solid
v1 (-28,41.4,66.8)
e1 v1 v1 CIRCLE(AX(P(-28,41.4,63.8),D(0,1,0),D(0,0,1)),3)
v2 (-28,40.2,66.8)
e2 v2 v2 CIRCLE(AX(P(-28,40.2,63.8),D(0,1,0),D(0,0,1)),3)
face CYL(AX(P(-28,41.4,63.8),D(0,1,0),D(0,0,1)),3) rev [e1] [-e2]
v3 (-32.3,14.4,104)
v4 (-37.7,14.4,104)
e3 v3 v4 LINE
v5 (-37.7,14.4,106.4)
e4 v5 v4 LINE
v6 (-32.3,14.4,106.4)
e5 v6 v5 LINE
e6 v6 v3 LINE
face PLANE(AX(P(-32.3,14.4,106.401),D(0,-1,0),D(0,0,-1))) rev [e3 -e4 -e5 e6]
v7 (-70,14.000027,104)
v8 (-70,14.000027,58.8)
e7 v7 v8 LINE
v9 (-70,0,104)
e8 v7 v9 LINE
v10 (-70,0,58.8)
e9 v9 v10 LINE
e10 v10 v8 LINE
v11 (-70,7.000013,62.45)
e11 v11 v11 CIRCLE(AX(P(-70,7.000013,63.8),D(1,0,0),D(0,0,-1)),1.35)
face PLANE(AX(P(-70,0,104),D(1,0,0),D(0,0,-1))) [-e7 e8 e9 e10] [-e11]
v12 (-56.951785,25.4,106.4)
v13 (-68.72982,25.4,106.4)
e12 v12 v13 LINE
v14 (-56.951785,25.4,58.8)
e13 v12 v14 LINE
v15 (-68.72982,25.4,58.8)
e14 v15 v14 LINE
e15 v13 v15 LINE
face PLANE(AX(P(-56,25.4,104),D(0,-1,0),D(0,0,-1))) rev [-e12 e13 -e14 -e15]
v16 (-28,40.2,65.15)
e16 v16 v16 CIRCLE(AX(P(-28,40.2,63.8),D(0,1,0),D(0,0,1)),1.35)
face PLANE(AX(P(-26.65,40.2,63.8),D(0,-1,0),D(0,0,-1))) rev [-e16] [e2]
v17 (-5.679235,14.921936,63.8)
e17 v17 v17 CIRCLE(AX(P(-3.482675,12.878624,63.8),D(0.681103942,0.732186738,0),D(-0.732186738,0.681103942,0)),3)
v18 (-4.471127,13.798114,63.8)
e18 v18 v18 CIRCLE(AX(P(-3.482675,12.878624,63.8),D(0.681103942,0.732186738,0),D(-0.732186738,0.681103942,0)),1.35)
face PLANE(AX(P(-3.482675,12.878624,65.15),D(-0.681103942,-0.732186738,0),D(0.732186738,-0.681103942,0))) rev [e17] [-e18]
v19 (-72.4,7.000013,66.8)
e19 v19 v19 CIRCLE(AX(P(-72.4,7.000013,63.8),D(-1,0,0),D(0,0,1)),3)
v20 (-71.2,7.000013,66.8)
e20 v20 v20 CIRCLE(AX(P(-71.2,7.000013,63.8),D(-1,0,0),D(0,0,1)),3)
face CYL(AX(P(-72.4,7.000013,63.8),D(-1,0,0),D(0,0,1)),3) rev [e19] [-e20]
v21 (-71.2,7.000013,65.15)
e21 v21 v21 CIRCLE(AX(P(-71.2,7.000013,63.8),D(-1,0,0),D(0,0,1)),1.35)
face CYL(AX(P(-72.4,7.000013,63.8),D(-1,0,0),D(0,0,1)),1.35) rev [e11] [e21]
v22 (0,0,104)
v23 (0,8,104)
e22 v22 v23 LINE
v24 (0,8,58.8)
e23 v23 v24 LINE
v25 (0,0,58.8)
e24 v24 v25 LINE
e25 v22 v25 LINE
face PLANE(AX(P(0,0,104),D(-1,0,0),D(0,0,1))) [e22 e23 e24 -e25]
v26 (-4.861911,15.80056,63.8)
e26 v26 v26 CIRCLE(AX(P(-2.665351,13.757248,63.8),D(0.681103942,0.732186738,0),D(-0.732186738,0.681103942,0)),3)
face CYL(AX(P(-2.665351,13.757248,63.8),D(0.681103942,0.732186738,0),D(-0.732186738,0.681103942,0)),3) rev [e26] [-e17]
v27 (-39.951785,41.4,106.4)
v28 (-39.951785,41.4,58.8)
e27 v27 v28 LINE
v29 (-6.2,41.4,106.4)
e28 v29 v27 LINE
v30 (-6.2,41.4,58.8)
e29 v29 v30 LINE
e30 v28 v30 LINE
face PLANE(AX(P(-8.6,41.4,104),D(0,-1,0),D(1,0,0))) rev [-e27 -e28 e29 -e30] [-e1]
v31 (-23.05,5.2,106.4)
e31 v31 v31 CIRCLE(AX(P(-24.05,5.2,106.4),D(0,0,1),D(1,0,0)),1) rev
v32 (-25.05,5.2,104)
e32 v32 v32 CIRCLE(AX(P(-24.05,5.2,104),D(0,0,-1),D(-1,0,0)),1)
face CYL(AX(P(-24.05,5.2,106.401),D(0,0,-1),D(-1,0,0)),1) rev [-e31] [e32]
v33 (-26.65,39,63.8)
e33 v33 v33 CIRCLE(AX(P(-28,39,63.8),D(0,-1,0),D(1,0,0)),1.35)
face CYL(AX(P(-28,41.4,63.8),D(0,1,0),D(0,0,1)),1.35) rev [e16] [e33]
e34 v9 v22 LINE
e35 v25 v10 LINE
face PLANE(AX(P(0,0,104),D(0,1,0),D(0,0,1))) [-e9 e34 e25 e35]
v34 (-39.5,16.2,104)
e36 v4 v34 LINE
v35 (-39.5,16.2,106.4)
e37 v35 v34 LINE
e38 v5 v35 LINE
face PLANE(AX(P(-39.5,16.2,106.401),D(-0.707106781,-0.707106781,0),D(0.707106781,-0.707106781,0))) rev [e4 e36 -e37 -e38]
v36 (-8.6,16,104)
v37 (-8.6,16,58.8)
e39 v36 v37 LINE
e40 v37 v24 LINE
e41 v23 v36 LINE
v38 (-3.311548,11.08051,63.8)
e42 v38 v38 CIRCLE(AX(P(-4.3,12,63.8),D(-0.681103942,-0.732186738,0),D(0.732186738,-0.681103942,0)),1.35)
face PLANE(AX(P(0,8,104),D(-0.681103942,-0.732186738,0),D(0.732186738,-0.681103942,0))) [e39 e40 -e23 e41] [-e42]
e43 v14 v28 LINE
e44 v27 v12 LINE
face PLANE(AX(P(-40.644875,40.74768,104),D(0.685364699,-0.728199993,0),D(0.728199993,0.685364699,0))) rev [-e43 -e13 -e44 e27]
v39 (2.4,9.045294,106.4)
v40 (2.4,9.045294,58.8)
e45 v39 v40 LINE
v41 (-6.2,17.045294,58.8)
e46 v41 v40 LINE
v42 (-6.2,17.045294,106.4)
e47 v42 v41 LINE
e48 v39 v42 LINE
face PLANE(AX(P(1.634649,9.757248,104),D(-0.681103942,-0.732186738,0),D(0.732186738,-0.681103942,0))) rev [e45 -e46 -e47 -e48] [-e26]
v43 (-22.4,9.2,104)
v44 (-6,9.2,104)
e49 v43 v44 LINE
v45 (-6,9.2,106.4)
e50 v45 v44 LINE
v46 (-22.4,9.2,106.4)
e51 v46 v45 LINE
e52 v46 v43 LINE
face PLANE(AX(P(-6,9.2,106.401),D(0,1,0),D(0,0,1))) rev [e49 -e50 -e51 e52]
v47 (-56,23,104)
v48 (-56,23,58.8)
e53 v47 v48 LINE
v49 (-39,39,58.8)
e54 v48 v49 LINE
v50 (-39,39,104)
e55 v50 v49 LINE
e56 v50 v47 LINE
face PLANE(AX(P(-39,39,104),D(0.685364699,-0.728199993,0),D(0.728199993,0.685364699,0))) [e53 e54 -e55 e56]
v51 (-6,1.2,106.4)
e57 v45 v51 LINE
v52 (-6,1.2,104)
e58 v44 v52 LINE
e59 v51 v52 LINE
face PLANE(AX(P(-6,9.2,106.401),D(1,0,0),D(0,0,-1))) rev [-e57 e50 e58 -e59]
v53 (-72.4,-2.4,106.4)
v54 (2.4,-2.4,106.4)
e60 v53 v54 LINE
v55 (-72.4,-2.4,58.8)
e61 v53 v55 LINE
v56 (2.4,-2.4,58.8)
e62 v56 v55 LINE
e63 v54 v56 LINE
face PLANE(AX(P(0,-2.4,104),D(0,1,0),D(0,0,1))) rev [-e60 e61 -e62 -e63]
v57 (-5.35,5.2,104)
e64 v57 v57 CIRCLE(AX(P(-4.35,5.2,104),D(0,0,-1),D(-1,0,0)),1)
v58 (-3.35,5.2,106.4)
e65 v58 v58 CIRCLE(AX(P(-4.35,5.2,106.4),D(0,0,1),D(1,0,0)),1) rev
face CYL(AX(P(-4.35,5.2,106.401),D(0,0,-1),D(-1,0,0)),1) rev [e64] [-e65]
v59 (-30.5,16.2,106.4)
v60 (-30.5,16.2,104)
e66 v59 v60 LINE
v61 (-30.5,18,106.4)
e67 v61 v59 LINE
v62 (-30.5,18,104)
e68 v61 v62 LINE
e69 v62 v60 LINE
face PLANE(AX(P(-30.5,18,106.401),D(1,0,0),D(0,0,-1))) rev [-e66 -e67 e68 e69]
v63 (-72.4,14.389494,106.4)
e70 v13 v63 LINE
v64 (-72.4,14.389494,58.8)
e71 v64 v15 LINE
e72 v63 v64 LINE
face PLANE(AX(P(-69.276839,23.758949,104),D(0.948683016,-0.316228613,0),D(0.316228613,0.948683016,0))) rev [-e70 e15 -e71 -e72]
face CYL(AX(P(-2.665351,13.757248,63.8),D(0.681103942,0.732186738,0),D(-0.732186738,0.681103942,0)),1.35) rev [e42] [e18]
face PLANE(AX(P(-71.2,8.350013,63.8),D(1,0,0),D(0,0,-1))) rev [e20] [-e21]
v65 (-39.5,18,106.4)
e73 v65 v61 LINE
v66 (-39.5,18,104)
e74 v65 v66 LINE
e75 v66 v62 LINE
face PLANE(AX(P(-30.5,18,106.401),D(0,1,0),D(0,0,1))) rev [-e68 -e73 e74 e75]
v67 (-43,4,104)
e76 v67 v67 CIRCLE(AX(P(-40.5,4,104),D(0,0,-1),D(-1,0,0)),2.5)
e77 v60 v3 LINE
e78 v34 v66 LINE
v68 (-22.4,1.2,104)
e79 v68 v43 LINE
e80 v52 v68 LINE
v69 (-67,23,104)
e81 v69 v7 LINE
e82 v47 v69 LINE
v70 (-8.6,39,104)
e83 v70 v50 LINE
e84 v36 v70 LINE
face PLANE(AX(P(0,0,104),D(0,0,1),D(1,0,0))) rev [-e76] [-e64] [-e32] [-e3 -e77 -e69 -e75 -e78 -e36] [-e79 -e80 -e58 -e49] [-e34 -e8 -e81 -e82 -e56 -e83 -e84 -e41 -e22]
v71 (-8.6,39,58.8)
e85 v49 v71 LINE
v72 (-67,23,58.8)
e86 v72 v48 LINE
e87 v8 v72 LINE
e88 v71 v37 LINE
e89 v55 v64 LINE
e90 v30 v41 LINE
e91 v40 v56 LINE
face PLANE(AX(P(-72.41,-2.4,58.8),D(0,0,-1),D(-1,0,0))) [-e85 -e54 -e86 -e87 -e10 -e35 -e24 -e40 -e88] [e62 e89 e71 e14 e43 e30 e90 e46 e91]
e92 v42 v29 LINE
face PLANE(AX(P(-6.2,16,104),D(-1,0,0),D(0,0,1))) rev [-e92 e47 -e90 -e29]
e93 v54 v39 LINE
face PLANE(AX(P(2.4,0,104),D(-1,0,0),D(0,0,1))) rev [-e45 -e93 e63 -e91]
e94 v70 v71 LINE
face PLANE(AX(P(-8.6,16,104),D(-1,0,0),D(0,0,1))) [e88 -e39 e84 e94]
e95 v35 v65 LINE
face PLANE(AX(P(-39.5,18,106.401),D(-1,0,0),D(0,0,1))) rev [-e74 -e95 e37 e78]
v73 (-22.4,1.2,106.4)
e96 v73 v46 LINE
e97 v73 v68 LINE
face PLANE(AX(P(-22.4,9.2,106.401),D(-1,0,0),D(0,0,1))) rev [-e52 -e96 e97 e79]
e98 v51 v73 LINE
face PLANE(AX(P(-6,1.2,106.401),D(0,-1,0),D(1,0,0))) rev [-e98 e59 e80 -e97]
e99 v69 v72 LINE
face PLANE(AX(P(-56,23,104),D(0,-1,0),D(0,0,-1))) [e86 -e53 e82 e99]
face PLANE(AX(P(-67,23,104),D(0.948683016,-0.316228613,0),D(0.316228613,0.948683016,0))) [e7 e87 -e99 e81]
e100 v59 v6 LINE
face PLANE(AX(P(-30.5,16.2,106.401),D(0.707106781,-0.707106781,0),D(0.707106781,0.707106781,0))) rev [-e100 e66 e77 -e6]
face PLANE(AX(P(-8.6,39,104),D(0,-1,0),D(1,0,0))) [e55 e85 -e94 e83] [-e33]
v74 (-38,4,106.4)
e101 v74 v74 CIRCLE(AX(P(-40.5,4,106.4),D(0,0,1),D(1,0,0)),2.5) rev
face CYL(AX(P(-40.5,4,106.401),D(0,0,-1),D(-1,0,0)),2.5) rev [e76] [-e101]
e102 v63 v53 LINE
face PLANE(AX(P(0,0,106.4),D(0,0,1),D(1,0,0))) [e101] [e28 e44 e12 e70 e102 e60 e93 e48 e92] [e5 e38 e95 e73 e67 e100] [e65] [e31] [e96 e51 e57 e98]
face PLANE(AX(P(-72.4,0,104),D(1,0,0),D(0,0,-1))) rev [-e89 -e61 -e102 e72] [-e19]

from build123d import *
from OCP.BRepFilletAPI import BRepFilletAPI_MakeChamfer

# Parameters (mm, degrees)
BOSS_EXTRUDE1_DEPTH                            = 104
SHELL1_START                                   = -8.6
SHELL1_OUTLINE_W                               = 16
SHELL1_OUTLINE_H                               = 108.8
SHELL1_DEPTH                                   = 2.4
SHELL1_START_2                                 = -56.951785259
SHELL1_2_OUTLINE_W                             = 43.8
SHELL1_2_OUTLINE_H                             = 108.8
SHELL1_2_DEPTH                                 = 50.751785259
SHELL1_START_3                                 = -72.4
SHELL1_3_OUTLINE_W                             = 27.8
SHELL1_3_OUTLINE_H                             = 108.8
SHELL1_3_DEPTH                                 = 74.8
SHELL1_4_DEPTH                                 = 104
SHELL1_START_4                                 = -2.4
SHELL1_5_DEPTH                                 = 108.8
SPLIT1_SURFACE_1_BACK                          = 140.108
SPLIT1_SURFACE_1_DEPTH                         = 280.216
SPLIT1_SURFACE_2_BACK                          = 140.108
SPLIT1_SURFACE_2_DEPTH                         = 280.216
BOSS_EXTRUDE2_DEPTH                            = 4
BOSS_EXTRUDE3_DEPTH                            = 4
BOSS_EXTRUDE4_DEPTH                            = 4
CHAMFER1_SIZE                                  = 4
CHAMFER1_SIZE_2                                = 6.92820323
CBORE_START                                    = 7.057493905
CBORE_FOR_M2_5_PAN_HEAD_MACHINE_SCREW1_O_R     = 3
CBORE_FOR_M2_5_PAN_HEAD_MACHINE_SCREW1_DEPTH   = 1.2
CBORE_START_2                                  = 5.857493905
CBORE_FOR_M2_5_PAN_HEAD_MACHINE_SCRE_2_R       = 1.35
CBORE_FOR_M2_5_PAN_HEAD_MACHINE_SCREW1_2_DEPTH = 1.2
CBORE_START_3                                  = 40.2
CBORE_FOR_M2_5_PAN_HEAD_MACHINE_SCRE_3_R       = 3
CBORE_FOR_M2_5_PAN_HEAD_MACHINE_SCREW1_3_DEPTH = 1.2
CBORE_START_4                                  = 38
CBORE_FOR_M2_5_PAN_HEAD_MACHINE_SCRE_4_R       = 1.35
CBORE_FOR_M2_5_PAN_HEAD_MACHINE_SCREW1_4_DEPTH = 2.2
CBORE_START_5                                  = -72.4
CBORE_FOR_M2_5_PAN_HEAD_MACHINE_SCRE_5_R       = 3
CBORE_FOR_M2_5_PAN_HEAD_MACHINE_SCREW1_5_DEPTH = 1.2
CBORE_START_6                                  = -71.2
CBORE_FOR_M2_5_PAN_HEAD_MACHINE_SCRE_6_R       = 1.35
CBORE_FOR_M2_5_PAN_HEAD_MACHINE_SCREW1_6_DEPTH = 1.2
CUT_EXTRUDE2_REACH                             = 96.862
SKETCH12_R                                     = 1
SKETCH12_R_2                                   = 2.5
SKETCH12_W                                     = 16.4
SKETCH12_H                                     = 8


with BuildPart() as part:
    # Sketch1 → Boss-Extrude1 (new body)
    with BuildSketch(Plane.XY):
        Polygon((-39, 39), (-56, 23), (-67, 23), (-70, 14.000026796), (-70, 0), (0, 0), (0, 8), (-8.6, 16), (-8.6, 39), align=None)
    extrude(amount=BOSS_EXTRUDE1_DEPTH)

    # Shell1: read off the stored shape, not the designer's step
    # Shell1 outline → Shell1 (add)
    with BuildSketch(Plane.YZ.offset(SHELL1_START)):
        with Locations((33.4, 52)):
            Rectangle(SHELL1_OUTLINE_W, SHELL1_OUTLINE_H)
    extrude(amount=SHELL1_DEPTH)

    # Shell1 2 outline → Shell1 2 (add)
    with BuildSketch(Plane.YZ.offset(SHELL1_START_2)):
        with Locations((19.5, 52)):
            Rectangle(SHELL1_2_OUTLINE_W, SHELL1_2_OUTLINE_H)
    extrude(amount=SHELL1_2_DEPTH)

    # Shell1 3 outline → Shell1 3 (add)
    with BuildSketch(Plane.YZ.offset(SHELL1_START_3)):
        with Locations((11.5, 52)):
            Rectangle(SHELL1_3_OUTLINE_W, SHELL1_3_OUTLINE_H)
    extrude(amount=SHELL1_3_DEPTH)

    # Shell1 4 outline → Shell1 4 (cut)
    with BuildSketch(Plane.XY):
        Polygon((-6.2, 25.4), (-6.2, 17.045294183), (2.4, 9.045294183), (2.4, 25.4), align=None)
        Polygon((-72.4, 14.389494281), (-68.729820499, 25.4), (-72.4, 25.4), align=None)
        Polygon((-56.951785259, 25.4), (-39.951785259, 41.4), (-56.951785259, 41.4), align=None)
        Polygon((0, 0), (0, 8), (-8.6, 16), (-8.6, 39), (-39, 39), (-56, 23), (-67, 23), (-70, 14.000026796), (-70, 0), align=None)
    extrude(amount=SHELL1_4_DEPTH, mode=Mode.SUBTRACT)

    # Shell1 5 outline → Shell1 5 (cut)
    with BuildSketch(Plane.XY.offset(SHELL1_START_4)):
        Polygon((-6.2, 25.4), (-6.2, 17.045294183), (2.4, 9.045294183), (2.4, 25.4), align=None)
        Polygon((-72.4, 14.389494281), (-68.729820499, 25.4), (-72.4, 25.4), align=None)
        Polygon((-56.951785259, 25.4), (-39.951785259, 41.4), (-56.951785259, 41.4), align=None)
    extrude(amount=SHELL1_5_DEPTH, mode=Mode.SUBTRACT)


with BuildPart() as body_2:
    # Split1: the piece behind the surface
    add(part.part)
    # Split1 surface: a surface, the sketch's curves swept straight by 280.216 mm
    with BuildLine(Plane(origin=(0, 0, 0), x_dir=(0, 0, -1), z_dir=(1, 0, 0)).offset(-SPLIT1_SURFACE_1_BACK), mode=Mode.PRIVATE) as split1_surface_1_path:
        Line((-58.8, -2.4), (-58.8, 41.4))
    split1_surface_1 = Shell.extrude(split1_surface_1_path.wire(), (1 * SPLIT1_SURFACE_1_DEPTH, 0 * SPLIT1_SURFACE_1_DEPTH, 0 * SPLIT1_SURFACE_1_DEPTH))
    split(bisect_by=split1_surface_1, keep=Keep.BOTTOM)

    # Sketch3 → Boss-Extrude2 (add)
    with BuildSketch(Plane(origin=(3.989562192, 4.288779356, 0), x_dir=(0.7321867381630838, -0.6811039424772873, 0), z_dir=(-0.6811039424772873, -0.7321867381630838, 0))):
        with BuildLine():
            Line((-14.321650284, 51.3), (-8.321650284, 51.3))
            Line((-8.321650284, 51.3), (-8.321650284, 63.8))
            ThreePointArc((-8.321650284, 63.8), (-11.321650284, 66.8), (-14.321650284, 63.8))
            Line((-14.321650284, 63.8), (-14.321650284, 51.3))
        make_face()
    extrude(amount=BOSS_EXTRUDE2_DEPTH)

    # Sketch4 → Boss-Extrude3 (add)
    with BuildSketch(Plane.XZ.offset(-39)):
        with BuildLine():
            Line((-31, 51.3), (-25, 51.3))
            Line((-25, 51.3), (-25, 63.8))
            ThreePointArc((-25, 63.8), (-28, 66.8), (-31, 63.8))
            Line((-31, 63.8), (-31, 51.3))
        make_face()
    extrude(amount=BOSS_EXTRUDE3_DEPTH)

    # Sketch5 → Boss-Extrude4 (add)
    with BuildSketch(Plane(origin=(-70, 0, 0), x_dir=(0, 0, -1), z_dir=(1, 0, 0))):
        with BuildLine():
            Line((-51.3, 10.000013398), (-63.8, 10.000013398))
            ThreePointArc((-63.8, 10.000013398), (-66.8, 7.000013398), (-63.8, 4.000013398))
            Line((-63.8, 4.000013398), (-51.3, 4.000013398))
            Line((-51.3, 4.000013398), (-51.3, 10.000013398))
        make_face()
    extrude(amount=BOSS_EXTRUDE4_DEPTH)

    # Chamfer1
    chamfer1_edges_1 = [body_2.edges().sort_by_distance(p)[0] for p in [
        (-7.02441577, 9.071253047, 51.3),
    ]]
    chamfer1_side_1 = [body_2.faces().sort_by_distance(p)[0] for p in [
        (-6.969927455, 9.129827986, 51.3),
    ]]
    chamfer1_edges_2 = [body_2.edges().sort_by_distance(p)[0] for p in [
        (-28, 35, 51.3),
    ]]
    chamfer1_side_2 = [body_2.faces().sort_by_distance(p)[0] for p in [
        (-28, 35.08, 51.3),
    ]]
    chamfer1_edges_3 = [body_2.edges().sort_by_distance(p)[0] for p in [
        (-66, 7.000013398, 51.3),
    ]]
    chamfer1_side_3 = [body_2.faces().sort_by_distance(p)[0] for p in [
        (-66.08, 7.000013398, 51.3),
    ]]
    chamfer1 = BRepFilletAPI_MakeChamfer(body_2.part.solid().wrapped)
    for e in chamfer1_edges_1:
        chamfer1.Add(CHAMFER1_SIZE - 0.0001, CHAMFER1_SIZE_2 - 0.0001, e.wrapped, chamfer1_side_1[0].wrapped)
    for e in chamfer1_edges_2:
        chamfer1.Add(CHAMFER1_SIZE - 0.0001, CHAMFER1_SIZE_2 - 0.0001, e.wrapped, chamfer1_side_2[0].wrapped)
    for e in chamfer1_edges_3:
        chamfer1.Add(CHAMFER1_SIZE - 0.0001, CHAMFER1_SIZE_2 - 0.0001, e.wrapped, chamfer1_side_3[0].wrapped)
    add(Compound.cast(chamfer1.Shape()), mode=Mode.REPLACE)  # a hair under: the kernel refuses the full size

    # CBORE for M2.5 Pan Head Machine Screw1 7: loft between two sections, ruled curve by curve
    cbore_for_m2_5_pan_head_machine_screw1_7_from = [
        Edge.make_three_point_arc((-8.012867866, 9.99074337, 63.8), (-7.02441577, 9.071253047, 65.15), (-6.035963673, 8.151762725, 63.8)),
        Edge.make_three_point_arc((-6.035963673, 8.151762725, 63.8), (-7.02441577, 9.071253047, 62.45), (-8.012867866, 9.99074337, 63.8)),
    ]
    cbore_for_m2_5_pan_head_machine_screw1_7_to = [
        Edge.make_three_point_arc((-5.288452097, 12.919490322, 63.8), (-4.3, 12, 65.15), (-3.311547903, 11.080509678, 63.8)),
        Edge.make_three_point_arc((-3.311547903, 11.080509678, 63.8), (-4.3, 12, 62.45), (-5.288452097, 12.919490322, 63.8)),
    ]
    cbore_for_m2_5_pan_head_machine_screw1_7 = Solid(Shell([*[Face.make_surface_from_curves(cbore_for_m2_5_pan_head_machine_screw1_7_from[k], cbore_for_m2_5_pan_head_machine_screw1_7_to[k]) for k in range(2)], Face(Wire(cbore_for_m2_5_pan_head_machine_screw1_7_from)), Face(Wire(cbore_for_m2_5_pan_head_machine_screw1_7_to))]))
    add(cbore_for_m2_5_pan_head_machine_screw1_7, mode=Mode.SUBTRACT)

    # CBORE for M2.5 Pan Head Machine Screw1 8: loft between two sections, ruled curve by curve
    cbore_for_m2_5_pan_head_machine_screw1_8_from = [
        Edge.make_three_point_arc((-29.35, 35, 63.8), (-28, 35, 65.15), (-26.65, 35, 63.8)),
        Edge.make_three_point_arc((-26.65, 35, 63.8), (-28, 35, 62.45), (-29.35, 35, 63.8)),
    ]
    cbore_for_m2_5_pan_head_machine_screw1_8_to = [
        Edge.make_three_point_arc((-29.35, 39, 63.8), (-28, 39, 65.15), (-26.65, 39, 63.8)),
        Edge.make_three_point_arc((-26.65, 39, 63.8), (-28, 39, 62.45), (-29.35, 39, 63.8)),
    ]
    cbore_for_m2_5_pan_head_machine_screw1_8 = Solid(Shell([*[Face.make_surface_from_curves(cbore_for_m2_5_pan_head_machine_screw1_8_from[k], cbore_for_m2_5_pan_head_machine_screw1_8_to[k]) for k in range(2)], Face(Wire(cbore_for_m2_5_pan_head_machine_screw1_8_from)), Face(Wire(cbore_for_m2_5_pan_head_machine_screw1_8_to))]))
    add(cbore_for_m2_5_pan_head_machine_screw1_8, mode=Mode.SUBTRACT)

    # CBORE for M2.5 Pan Head Machine Screw1 9: loft between two sections, ruled curve by curve
    cbore_for_m2_5_pan_head_machine_screw1_9_from = [
        Edge.make_three_point_arc((-66, 7.000013398, 65.15), (-66, 8.350013398, 63.8), (-66, 7.000013398, 62.45)),
        Edge.make_three_point_arc((-66, 7.000013398, 62.45), (-66, 5.650013398, 63.8), (-66, 7.000013398, 65.15)),
    ]
    cbore_for_m2_5_pan_head_machine_screw1_9_to = [
        Edge.make_three_point_arc((-70, 7.000013398, 65.15), (-70, 8.350013398, 63.8), (-70, 7.000013398, 62.45)),
        Edge.make_three_point_arc((-70, 7.000013398, 62.45), (-70, 5.650013398, 63.8), (-70, 7.000013398, 65.15)),
    ]
    cbore_for_m2_5_pan_head_machine_screw1_9 = Solid(Shell([*[Face.make_surface_from_curves(cbore_for_m2_5_pan_head_machine_screw1_9_from[k], cbore_for_m2_5_pan_head_machine_screw1_9_to[k]) for k in range(2)], Face(Wire(cbore_for_m2_5_pan_head_machine_screw1_9_from)), Face(Wire(cbore_for_m2_5_pan_head_machine_screw1_9_to))]))
    add(cbore_for_m2_5_pan_head_machine_screw1_9, mode=Mode.SUBTRACT)


with BuildPart() as part_1:
    add(part.part)

    # Split1: split by a surface, the side it looks to stays
    # Split1 surface: a surface, the sketch's curves swept straight by 280.216 mm
    with BuildLine(Plane(origin=(0, 0, 0), x_dir=(0, 0, -1), z_dir=(1, 0, 0)).offset(-SPLIT1_SURFACE_2_BACK), mode=Mode.PRIVATE) as split1_surface_2_path:
        Line((-58.8, -2.4), (-58.8, 41.4))
    split1_surface_2 = Shell.extrude(split1_surface_2_path.wire(), (1 * SPLIT1_SURFACE_2_DEPTH, 0 * SPLIT1_SURFACE_2_DEPTH, 0 * SPLIT1_SURFACE_2_DEPTH))
    split(bisect_by=split1_surface_2, keep=Keep.TOP)

    # CBORE for M2.5 Pan Head Machine Screw1: read off the stored shape, not the designer's step
    # CBORE for M2.5 Pan Head Machine Screw1 o → CBORE for M2.5 Pan Head Machine Screw1 (cut)
    with BuildSketch(Plane(origin=(0, 0, 0), x_dir=(0.732186738163084, -0.681103942477287, 0), z_dir=(0.681103942477287, 0.732186738163084, 0)).offset(CBORE_START)):
        with Locations((-11.321650284, -63.8)):
            Circle(CBORE_FOR_M2_5_PAN_HEAD_MACHINE_SCREW1_O_R)
    extrude(amount=CBORE_FOR_M2_5_PAN_HEAD_MACHINE_SCREW1_DEPTH, mode=Mode.SUBTRACT)

    # CBORE for M2.5 Pan Head Machine Scre 2 → CBORE for M2.5 Pan Head Machine Screw1 2 (cut)
    with BuildSketch(Plane(origin=(0, 0, 0), x_dir=(0.732186738163084, -0.681103942477287, 0), z_dir=(0.681103942477287, 0.732186738163084, 0)).offset(CBORE_START_2)):
        with Locations((-11.321650284, -63.8)):
            Circle(CBORE_FOR_M2_5_PAN_HEAD_MACHINE_SCRE_2_R)
    extrude(amount=CBORE_FOR_M2_5_PAN_HEAD_MACHINE_SCREW1_2_DEPTH, mode=Mode.SUBTRACT)

    # CBORE for M2.5 Pan Head Machine Scre 3 → CBORE for M2.5 Pan Head Machine Screw1 3 (cut)
    with BuildSketch(Plane(origin=(0, 0, 0), x_dir=(1, 0, 0), z_dir=(0, 1, 0)).offset(CBORE_START_3)):
        with Locations((-28, -63.8)):
            Circle(CBORE_FOR_M2_5_PAN_HEAD_MACHINE_SCRE_3_R)
    extrude(amount=CBORE_FOR_M2_5_PAN_HEAD_MACHINE_SCREW1_3_DEPTH, mode=Mode.SUBTRACT)

    # CBORE for M2.5 Pan Head Machine Scre 4 → CBORE for M2.5 Pan Head Machine Screw1 4 (cut)
    with BuildSketch(Plane(origin=(0, 0, 0), x_dir=(1, 0, 0), z_dir=(0, 1, 0)).offset(CBORE_START_4)):
        with Locations((-28, -63.8)):
            Circle(CBORE_FOR_M2_5_PAN_HEAD_MACHINE_SCRE_4_R)
    extrude(amount=CBORE_FOR_M2_5_PAN_HEAD_MACHINE_SCREW1_4_DEPTH, mode=Mode.SUBTRACT)

    # CBORE for M2.5 Pan Head Machine Scre 5 → CBORE for M2.5 Pan Head Machine Screw1 5 (cut)
    with BuildSketch(Plane.YZ.offset(CBORE_START_5)):
        with Locations((7.000013398, 63.8)):
            Circle(CBORE_FOR_M2_5_PAN_HEAD_MACHINE_SCRE_5_R)
    extrude(amount=CBORE_FOR_M2_5_PAN_HEAD_MACHINE_SCREW1_5_DEPTH, mode=Mode.SUBTRACT)

    # CBORE for M2.5 Pan Head Machine Scre 6 → CBORE for M2.5 Pan Head Machine Screw1 6 (cut)
    with BuildSketch(Plane.YZ.offset(CBORE_START_6)):
        with Locations((7.000013398, 63.8)):
            Circle(CBORE_FOR_M2_5_PAN_HEAD_MACHINE_SCRE_6_R)
    extrude(amount=CBORE_FOR_M2_5_PAN_HEAD_MACHINE_SCREW1_6_DEPTH, mode=Mode.SUBTRACT)

    # Sketch12 → Cut-Extrude2 (cut, up to next)
    with BuildSketch(Plane(origin=(0, 0, 104), x_dir=(-1, 0, 0), z_dir=(0, 0, -1)), mode=Mode.PRIVATE) as cut_extrude2_sk1:
        with Locations((4.35, 5.2)):
            Circle(SKETCH12_R)
    cut_extrude2_tool1 = extrude(cut_extrude2_sk1.sketch, amount=-CUT_EXTRUDE2_REACH, mode=Mode.PRIVATE) & part_1.part
    # Sketch12 → Cut-Extrude2 (cut, up to next)
    with BuildSketch(Plane(origin=(0, 0, 104), x_dir=(-1, 0, 0), z_dir=(0, 0, -1)), mode=Mode.PRIVATE) as cut_extrude2_sk2:
        with Locations((24.05, 5.2)):
            Circle(SKETCH12_R)
    cut_extrude2_tool2 = extrude(cut_extrude2_sk2.sketch, amount=-CUT_EXTRUDE2_REACH, mode=Mode.PRIVATE) & part_1.part
    # Sketch12 → Cut-Extrude2 (cut, up to next)
    with BuildSketch(Plane(origin=(0, 0, 104), x_dir=(-1, 0, 0), z_dir=(0, 0, -1)), mode=Mode.PRIVATE) as cut_extrude2_sk3:
        with Locations((40.5, 4)):
            Circle(SKETCH12_R_2)
    cut_extrude2_tool3 = extrude(cut_extrude2_sk3.sketch, amount=-CUT_EXTRUDE2_REACH, mode=Mode.PRIVATE) & part_1.part
    # Sketch12 → Cut-Extrude2 (cut, up to next)
    with BuildSketch(Plane(origin=(0, 0, 104), x_dir=(-1, 0, 0), z_dir=(0, 0, -1)), mode=Mode.PRIVATE) as cut_extrude2_sk4:
        with Locations((14.2, 5.2)):
            Rectangle(SKETCH12_W, SKETCH12_H)
    cut_extrude2_tool4 = extrude(cut_extrude2_sk4.sketch, amount=-CUT_EXTRUDE2_REACH, mode=Mode.PRIVATE) & part_1.part
    # Sketch12 → Cut-Extrude2 (cut, up to next)
    with BuildSketch(Plane(origin=(0, 0, 104), x_dir=(-1, 0, 0), z_dir=(0, 0, -1)), mode=Mode.PRIVATE) as cut_extrude2_sk5:
        Polygon((30.5, 16.2), (32.3, 14.4), (37.7, 14.4), (39.5, 16.2), (39.5, 18), (30.5, 18), align=None)
    cut_extrude2_tool5 = extrude(cut_extrude2_sk5.sketch, amount=-CUT_EXTRUDE2_REACH, mode=Mode.PRIVATE) & part_1.part
    add(cut_extrude2_tool1.solids().sort_by_distance((-4.35, 5.2, 104))[0], mode=Mode.SUBTRACT)
    add(cut_extrude2_tool2.solids().sort_by_distance((-24.05, 5.2, 104))[0], mode=Mode.SUBTRACT)
    add(cut_extrude2_tool3.solids().sort_by_distance((-40.5, 4, 104))[0], mode=Mode.SUBTRACT)
    add(cut_extrude2_tool4.solids().sort_by_distance((-14.2, 5.2, 104))[0], mode=Mode.SUBTRACT)
    add(cut_extrude2_tool5.solids().sort_by_distance((-35, 16.333333, 104))[0], mode=Mode.SUBTRACT)


solid = part_1.part
